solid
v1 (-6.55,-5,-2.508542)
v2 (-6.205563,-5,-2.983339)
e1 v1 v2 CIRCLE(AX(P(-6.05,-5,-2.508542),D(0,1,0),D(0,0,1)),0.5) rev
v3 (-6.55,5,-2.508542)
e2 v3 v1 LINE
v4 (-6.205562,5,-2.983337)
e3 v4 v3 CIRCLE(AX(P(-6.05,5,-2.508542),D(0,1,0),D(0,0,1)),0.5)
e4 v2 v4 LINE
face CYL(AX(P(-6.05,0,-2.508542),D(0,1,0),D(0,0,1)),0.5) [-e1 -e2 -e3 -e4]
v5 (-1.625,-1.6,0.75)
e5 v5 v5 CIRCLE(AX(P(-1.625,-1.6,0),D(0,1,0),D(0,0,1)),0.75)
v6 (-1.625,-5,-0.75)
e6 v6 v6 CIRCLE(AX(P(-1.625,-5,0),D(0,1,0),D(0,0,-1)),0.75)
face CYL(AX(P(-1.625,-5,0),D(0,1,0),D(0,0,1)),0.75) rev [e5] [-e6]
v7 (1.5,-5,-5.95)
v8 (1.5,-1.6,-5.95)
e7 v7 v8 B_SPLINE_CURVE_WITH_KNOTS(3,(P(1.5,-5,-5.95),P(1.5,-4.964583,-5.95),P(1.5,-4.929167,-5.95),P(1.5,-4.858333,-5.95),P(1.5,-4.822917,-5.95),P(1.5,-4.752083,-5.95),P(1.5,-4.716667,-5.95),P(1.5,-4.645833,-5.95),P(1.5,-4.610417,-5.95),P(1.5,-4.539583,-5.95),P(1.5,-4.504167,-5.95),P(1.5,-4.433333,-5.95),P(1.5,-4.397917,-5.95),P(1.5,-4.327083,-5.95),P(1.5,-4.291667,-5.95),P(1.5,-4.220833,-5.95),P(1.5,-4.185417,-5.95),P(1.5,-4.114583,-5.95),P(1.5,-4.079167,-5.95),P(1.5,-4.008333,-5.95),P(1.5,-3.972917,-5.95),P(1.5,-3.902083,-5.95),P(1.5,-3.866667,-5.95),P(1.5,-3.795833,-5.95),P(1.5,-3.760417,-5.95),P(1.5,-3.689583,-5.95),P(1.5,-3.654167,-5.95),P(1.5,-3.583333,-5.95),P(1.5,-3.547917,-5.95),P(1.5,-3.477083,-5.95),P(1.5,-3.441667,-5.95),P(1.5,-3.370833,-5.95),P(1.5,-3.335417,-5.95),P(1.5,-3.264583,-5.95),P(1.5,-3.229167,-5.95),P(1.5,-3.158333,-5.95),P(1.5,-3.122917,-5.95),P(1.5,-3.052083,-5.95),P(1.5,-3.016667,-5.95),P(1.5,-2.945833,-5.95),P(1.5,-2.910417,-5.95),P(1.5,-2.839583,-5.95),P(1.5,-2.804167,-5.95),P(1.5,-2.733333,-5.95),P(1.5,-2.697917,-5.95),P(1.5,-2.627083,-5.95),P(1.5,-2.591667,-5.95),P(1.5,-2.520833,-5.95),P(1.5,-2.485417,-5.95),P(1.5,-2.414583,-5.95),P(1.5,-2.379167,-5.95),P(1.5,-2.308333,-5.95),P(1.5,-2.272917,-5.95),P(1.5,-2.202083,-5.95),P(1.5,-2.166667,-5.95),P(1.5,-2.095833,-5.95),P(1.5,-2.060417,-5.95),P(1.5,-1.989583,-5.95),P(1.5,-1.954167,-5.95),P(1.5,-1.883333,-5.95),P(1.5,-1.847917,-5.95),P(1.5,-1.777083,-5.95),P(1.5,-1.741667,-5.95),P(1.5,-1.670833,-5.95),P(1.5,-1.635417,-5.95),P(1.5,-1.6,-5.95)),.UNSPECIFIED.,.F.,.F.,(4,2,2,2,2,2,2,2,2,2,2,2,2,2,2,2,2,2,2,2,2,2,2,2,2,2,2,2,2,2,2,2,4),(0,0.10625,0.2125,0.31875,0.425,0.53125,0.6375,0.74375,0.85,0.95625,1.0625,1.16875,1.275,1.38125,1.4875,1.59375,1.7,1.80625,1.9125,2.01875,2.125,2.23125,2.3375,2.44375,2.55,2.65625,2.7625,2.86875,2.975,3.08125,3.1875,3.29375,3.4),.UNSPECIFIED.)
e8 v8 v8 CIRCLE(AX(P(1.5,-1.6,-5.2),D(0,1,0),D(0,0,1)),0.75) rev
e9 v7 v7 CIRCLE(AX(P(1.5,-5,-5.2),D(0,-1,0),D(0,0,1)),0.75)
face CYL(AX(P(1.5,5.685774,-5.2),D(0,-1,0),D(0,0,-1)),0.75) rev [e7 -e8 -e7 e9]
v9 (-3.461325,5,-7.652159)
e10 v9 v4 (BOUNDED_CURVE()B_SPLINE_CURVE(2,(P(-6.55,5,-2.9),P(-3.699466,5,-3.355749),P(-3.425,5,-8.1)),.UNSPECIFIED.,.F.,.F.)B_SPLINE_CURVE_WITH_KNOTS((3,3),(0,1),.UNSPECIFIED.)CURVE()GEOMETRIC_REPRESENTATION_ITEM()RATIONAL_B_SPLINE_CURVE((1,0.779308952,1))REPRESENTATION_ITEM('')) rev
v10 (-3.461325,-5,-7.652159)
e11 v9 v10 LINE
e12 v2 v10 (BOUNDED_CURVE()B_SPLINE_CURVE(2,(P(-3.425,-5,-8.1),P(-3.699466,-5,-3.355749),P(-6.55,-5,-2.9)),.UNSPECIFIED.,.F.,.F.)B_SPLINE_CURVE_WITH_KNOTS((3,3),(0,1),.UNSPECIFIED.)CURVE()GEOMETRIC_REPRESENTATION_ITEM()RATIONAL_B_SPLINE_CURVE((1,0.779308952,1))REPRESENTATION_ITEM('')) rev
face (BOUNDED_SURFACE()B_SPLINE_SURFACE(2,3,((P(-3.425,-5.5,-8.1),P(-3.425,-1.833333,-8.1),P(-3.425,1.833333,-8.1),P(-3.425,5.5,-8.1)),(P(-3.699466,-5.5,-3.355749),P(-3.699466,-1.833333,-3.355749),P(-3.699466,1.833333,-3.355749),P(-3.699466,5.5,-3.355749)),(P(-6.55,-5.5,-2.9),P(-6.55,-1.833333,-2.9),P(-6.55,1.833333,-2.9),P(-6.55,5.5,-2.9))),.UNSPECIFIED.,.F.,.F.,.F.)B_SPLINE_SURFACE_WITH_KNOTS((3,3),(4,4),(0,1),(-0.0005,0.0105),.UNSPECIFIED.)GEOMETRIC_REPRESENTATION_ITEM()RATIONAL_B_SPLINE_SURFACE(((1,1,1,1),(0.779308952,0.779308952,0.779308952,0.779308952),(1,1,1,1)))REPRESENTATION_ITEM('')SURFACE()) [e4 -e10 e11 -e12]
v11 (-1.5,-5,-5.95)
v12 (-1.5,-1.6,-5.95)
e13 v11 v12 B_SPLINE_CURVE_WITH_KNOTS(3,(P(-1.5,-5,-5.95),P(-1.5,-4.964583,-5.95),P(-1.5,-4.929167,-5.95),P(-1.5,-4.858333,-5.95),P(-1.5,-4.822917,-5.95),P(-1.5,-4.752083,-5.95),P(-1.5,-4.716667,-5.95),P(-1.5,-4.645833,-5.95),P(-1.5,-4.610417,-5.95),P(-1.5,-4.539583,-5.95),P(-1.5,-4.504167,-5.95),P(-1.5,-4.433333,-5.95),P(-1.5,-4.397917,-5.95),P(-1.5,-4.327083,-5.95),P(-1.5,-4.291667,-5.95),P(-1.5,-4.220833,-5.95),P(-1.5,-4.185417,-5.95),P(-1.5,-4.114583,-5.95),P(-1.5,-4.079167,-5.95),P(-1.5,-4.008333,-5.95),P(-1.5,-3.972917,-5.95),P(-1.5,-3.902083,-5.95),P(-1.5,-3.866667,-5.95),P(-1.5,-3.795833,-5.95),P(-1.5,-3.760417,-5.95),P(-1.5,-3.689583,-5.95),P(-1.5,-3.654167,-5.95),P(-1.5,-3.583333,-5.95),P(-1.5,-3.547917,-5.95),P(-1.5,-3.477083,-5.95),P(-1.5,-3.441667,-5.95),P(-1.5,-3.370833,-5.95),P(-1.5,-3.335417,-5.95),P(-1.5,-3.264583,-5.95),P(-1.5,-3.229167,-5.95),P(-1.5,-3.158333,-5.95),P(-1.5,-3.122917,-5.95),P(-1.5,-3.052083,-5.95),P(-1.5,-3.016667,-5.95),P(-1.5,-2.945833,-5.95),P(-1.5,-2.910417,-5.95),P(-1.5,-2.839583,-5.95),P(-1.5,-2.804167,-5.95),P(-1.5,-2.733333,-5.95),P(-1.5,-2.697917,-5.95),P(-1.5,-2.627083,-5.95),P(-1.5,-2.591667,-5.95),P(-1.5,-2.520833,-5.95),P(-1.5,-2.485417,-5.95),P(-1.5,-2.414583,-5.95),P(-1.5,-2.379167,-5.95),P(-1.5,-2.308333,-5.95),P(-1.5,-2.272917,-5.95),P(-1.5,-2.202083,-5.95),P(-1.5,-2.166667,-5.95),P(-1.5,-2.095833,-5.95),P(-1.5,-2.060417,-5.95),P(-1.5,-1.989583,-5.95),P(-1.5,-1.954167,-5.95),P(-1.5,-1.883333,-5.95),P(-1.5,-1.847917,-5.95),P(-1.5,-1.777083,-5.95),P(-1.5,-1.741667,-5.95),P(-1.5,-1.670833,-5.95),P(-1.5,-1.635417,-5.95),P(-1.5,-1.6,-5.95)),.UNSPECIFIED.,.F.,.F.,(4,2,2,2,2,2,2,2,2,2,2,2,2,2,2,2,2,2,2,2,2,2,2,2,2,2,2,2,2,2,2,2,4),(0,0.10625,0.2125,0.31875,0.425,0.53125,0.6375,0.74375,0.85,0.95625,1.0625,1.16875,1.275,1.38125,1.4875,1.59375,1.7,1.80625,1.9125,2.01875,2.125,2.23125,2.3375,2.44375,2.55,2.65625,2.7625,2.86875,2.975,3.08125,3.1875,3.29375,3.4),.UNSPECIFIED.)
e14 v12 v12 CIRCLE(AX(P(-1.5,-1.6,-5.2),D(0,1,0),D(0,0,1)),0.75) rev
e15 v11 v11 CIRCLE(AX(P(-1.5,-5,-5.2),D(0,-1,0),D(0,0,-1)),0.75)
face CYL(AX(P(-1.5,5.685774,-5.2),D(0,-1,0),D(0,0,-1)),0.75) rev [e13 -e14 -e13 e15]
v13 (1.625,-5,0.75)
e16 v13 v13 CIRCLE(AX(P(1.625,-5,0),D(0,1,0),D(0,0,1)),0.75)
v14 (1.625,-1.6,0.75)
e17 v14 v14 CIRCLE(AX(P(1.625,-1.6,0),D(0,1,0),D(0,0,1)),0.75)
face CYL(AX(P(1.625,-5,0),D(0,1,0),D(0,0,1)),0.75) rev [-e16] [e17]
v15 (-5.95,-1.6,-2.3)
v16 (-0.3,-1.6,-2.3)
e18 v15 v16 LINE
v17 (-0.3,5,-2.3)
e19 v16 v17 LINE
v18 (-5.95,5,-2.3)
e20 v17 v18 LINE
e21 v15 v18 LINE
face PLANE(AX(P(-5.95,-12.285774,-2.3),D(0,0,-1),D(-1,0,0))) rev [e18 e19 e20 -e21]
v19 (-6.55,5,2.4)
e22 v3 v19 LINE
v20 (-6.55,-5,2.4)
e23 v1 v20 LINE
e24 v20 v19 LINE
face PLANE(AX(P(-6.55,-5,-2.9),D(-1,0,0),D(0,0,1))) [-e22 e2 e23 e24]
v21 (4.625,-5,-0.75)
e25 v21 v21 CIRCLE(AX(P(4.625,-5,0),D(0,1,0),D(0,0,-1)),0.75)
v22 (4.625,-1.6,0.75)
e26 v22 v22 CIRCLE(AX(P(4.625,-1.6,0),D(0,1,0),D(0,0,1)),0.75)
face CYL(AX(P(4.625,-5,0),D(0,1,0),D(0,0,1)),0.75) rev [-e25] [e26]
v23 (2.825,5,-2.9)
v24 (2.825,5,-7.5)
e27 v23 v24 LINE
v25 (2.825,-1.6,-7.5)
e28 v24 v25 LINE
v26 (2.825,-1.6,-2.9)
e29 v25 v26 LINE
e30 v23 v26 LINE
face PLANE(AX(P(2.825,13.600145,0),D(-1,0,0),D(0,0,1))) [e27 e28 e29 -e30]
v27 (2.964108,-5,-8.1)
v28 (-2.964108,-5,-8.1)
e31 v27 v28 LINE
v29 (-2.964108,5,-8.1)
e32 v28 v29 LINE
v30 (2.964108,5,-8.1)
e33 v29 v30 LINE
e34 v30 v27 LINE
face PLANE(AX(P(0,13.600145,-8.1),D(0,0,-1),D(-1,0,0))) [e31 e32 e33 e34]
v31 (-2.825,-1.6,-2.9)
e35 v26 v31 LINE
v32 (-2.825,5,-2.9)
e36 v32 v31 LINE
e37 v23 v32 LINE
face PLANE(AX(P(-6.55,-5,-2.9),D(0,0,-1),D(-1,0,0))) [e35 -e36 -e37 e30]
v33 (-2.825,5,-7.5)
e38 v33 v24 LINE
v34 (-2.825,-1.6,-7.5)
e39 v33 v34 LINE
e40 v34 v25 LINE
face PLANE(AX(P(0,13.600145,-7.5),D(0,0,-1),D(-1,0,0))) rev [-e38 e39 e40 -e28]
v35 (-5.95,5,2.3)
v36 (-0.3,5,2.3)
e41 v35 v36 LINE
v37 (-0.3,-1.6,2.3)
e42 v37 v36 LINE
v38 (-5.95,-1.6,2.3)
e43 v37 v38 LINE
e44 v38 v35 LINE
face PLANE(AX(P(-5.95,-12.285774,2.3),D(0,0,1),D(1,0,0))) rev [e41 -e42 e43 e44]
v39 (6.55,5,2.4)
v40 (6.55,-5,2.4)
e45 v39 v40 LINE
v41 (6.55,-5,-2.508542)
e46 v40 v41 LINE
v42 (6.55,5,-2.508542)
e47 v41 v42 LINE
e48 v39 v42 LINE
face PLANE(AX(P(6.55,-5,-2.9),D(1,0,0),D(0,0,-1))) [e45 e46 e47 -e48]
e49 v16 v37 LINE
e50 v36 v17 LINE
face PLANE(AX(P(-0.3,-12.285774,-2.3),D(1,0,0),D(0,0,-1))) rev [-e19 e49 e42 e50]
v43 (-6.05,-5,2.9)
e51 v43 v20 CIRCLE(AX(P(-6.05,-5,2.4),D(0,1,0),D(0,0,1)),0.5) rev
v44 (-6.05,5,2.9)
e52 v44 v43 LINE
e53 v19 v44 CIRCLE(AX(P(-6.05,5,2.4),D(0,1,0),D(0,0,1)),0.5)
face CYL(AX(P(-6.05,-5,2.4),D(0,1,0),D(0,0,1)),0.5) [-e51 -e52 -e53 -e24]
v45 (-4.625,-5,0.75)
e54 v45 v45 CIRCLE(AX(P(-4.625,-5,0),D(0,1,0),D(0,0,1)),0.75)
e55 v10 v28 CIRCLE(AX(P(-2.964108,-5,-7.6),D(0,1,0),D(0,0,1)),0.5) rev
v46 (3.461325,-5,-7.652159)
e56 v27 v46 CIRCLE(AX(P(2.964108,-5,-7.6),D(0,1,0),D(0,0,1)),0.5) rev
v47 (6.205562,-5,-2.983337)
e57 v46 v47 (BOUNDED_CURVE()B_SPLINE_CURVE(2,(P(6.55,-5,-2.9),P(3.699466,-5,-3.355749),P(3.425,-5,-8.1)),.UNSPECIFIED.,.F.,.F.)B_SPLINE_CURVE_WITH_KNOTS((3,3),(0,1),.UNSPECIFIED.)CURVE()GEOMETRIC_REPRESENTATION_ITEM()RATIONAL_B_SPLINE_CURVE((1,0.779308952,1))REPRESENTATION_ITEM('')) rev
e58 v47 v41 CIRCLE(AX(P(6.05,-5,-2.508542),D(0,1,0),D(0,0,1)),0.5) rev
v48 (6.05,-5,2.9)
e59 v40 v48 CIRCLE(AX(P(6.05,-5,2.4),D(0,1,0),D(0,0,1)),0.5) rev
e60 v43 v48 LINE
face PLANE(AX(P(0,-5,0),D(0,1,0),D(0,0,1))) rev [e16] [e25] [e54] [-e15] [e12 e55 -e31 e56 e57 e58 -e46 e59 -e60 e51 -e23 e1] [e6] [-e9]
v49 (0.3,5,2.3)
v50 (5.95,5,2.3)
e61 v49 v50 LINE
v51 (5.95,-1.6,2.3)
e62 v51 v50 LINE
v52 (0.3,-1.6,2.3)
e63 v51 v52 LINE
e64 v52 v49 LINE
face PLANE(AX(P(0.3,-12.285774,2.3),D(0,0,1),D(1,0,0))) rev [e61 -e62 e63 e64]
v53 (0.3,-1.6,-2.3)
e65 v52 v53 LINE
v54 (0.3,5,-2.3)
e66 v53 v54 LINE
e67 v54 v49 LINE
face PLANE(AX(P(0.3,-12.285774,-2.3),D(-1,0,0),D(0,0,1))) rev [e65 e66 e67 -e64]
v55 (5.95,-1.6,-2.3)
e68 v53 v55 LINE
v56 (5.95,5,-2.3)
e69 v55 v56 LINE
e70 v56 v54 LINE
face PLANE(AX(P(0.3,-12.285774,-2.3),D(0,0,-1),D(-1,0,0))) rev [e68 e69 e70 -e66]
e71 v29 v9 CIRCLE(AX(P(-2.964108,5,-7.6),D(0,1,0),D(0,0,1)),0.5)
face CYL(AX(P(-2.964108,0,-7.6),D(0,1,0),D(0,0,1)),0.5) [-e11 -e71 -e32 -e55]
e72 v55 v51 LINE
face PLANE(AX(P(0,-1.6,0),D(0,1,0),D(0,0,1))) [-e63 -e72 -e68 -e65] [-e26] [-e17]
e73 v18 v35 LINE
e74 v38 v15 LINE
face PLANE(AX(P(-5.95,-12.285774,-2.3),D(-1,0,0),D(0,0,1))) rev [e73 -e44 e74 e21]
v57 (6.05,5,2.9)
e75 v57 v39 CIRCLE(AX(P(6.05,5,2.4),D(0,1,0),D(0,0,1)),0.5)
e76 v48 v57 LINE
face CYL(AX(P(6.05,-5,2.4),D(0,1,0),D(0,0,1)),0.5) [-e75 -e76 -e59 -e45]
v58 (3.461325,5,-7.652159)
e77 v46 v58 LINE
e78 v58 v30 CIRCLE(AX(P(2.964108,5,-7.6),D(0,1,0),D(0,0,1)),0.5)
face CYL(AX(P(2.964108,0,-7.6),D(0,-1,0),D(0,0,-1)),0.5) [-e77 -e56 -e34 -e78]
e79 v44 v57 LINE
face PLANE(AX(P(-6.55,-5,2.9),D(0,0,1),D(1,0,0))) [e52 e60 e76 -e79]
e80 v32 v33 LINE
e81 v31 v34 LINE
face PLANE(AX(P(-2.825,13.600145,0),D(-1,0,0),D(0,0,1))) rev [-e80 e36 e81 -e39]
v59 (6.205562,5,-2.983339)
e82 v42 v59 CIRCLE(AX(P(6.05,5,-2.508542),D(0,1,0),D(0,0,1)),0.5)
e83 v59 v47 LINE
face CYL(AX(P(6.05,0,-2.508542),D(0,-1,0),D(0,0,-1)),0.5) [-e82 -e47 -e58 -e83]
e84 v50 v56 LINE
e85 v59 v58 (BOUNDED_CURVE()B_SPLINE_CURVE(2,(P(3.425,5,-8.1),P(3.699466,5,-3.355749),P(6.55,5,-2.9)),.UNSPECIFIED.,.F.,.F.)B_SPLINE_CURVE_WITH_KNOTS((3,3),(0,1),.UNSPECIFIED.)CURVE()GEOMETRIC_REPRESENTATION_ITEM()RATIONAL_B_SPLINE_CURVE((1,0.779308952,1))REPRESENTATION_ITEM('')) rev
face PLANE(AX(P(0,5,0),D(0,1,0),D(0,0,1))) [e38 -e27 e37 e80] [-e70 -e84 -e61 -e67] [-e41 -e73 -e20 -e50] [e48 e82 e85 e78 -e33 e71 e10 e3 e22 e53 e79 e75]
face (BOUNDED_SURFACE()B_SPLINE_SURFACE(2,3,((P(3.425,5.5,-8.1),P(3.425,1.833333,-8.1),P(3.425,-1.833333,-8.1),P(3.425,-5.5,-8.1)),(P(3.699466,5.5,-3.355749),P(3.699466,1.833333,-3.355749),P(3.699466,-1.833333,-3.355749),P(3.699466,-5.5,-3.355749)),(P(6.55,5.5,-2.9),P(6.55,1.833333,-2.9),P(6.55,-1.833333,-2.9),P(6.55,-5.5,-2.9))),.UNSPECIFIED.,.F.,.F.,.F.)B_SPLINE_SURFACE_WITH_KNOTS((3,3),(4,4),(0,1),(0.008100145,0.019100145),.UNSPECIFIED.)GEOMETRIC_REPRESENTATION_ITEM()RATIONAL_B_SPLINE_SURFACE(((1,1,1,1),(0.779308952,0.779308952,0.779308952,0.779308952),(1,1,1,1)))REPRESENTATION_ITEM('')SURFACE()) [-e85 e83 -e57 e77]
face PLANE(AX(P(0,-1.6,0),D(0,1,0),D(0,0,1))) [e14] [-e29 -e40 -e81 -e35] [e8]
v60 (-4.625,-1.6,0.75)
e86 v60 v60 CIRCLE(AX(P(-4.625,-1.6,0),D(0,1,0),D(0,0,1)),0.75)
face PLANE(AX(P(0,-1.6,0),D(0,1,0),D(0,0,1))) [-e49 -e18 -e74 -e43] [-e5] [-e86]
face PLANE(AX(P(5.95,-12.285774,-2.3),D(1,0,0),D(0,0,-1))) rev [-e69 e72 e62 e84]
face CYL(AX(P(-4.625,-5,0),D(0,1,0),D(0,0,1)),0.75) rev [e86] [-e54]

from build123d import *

# Parameters (mm, degrees)
SKETCH1_W               = 13.1
SKETCH1_H               = 5.8
BOSS_EXTRUDE1_DEPTH     = 5
SKETCH10_W              = 5.65
SKETCH10_H              = 4.6
CUT_EXTRUDE7_DEPTH      = 6.6
CUT_EXTRUDE6_DEPTH      = 9.735702605
CUT_EXTRUDE6_DEPTH_BACK = 9.735702605
SKETCH9_R               = 0.75
BOSS_EXTRUDE2_START     = -5
BOSS_EXTRUDE2_DEPTH     = 10
SKETCH12_W              = 5.65
SKETCH12_H              = 4.6
SKETCH12_R              = 0.75
BOSS_EXTRUDE3_DEPTH     = 3.4
FILLET1_START           = -5
FILLET1_DEPTH           = 10
FILLET2_R               = 0.5


with BuildPart() as part:
    # Sketch1 → Boss-Extrude1 (new, symmetric)
    with BuildSketch(Plane(origin=(0, 0, 0), x_dir=(1, 0, 0), z_dir=(0, 1, 0))):
        Rectangle(SKETCH1_W, SKETCH1_H)
    extrude(amount=BOSS_EXTRUDE1_DEPTH, both=True)

    # Sketch10 → Cut-Extrude7 (cut)
    with BuildSketch(Plane(origin=(0, 5, 0), x_dir=(1, 0, 0), z_dir=(0, 1, 0))):
        with Locations((-3.125, 0)):
            Rectangle(SKETCH10_W, SKETCH10_H)
        with Locations((3.125, 0)):
            Rectangle(SKETCH10_W, SKETCH10_H)
    extrude(amount=-CUT_EXTRUDE7_DEPTH, mode=Mode.SUBTRACT)

    # Sketch9 → Cut-Extrude6 (cut, two sides: drawn at the far end of the back side and taken through both)
    with BuildSketch(Plane(origin=(0, 0, 0), x_dir=(1, 0, 0), z_dir=(0, 1, 0)).offset(-CUT_EXTRUDE6_DEPTH_BACK)):
        with Locations(Location((-4.625, 0, 0), (0, 0, 270))):
            Circle(SKETCH9_R)
        with Locations(Location((-1.625, 0, 0), (0, 0, 270))):
            Circle(SKETCH9_R)
        with Locations(Location((1.625, 0, 0), (0, 0, 270))):
            Circle(SKETCH9_R)
        with Locations(Location((4.625, 0, 0), (0, 0, 270))):
            Circle(SKETCH9_R)
    extrude(amount=CUT_EXTRUDE6_DEPTH + CUT_EXTRUDE6_DEPTH_BACK, mode=Mode.SUBTRACT)

    # Sketch11 → Boss-Extrude2 (add)
    with BuildSketch(Plane(origin=(0, 0, 0), x_dir=(1, 0, 0), z_dir=(0, 1, 0)).offset(BOSS_EXTRUDE2_START)):
        Polygon((-3.425, 8.1), (-3.425, 2.9), (-2.825, 2.9), (-2.825, 7.5), (2.825, 7.5), (2.825, 2.9), (3.425, 2.9), (3.425, 8.1), align=None)
    extrude(amount=BOSS_EXTRUDE2_DEPTH)

    # Sketch12 → Boss-Extrude3 (add)
    with BuildSketch(Plane.XZ.offset(5)):
        with Locations((0, -5.2)):
            Rectangle(SKETCH12_W, SKETCH12_H)
        with Locations(Location((-1.5, -5.2, 0), (0, 0, 270))):
            Circle(SKETCH12_R, mode=Mode.SUBTRACT)
        with Locations(Location((1.5, -5.2, 0), (0, 0, 270))):
            Circle(SKETCH12_R, mode=Mode.SUBTRACT)
    extrude(amount=-BOSS_EXTRUDE3_DEPTH)

    # Fillet1: read off the stored shape, not the designer's step
    # Fillet1 outline → Fillet1 (add)
    with BuildSketch(Plane(origin=(0, 0, 0), x_dir=(1, 0, 0), z_dir=(0, 1, 0)).offset(FILLET1_START)):
        with BuildLine():
            add(Edge.make_bspline(
                [(3.425, 8.1), (3.699466412, 3.355749046), (6.55, 2.9)],
                knots=[0, 0, 0, 1, 1, 1], degree=2, weights=[1, 0.779308952, 1]))
            Line((3.425, 8.1), (3.425, 2.9))
            Line((3.425, 2.9), (6.55, 2.9))
        make_face()
        with BuildLine():
            Line((-3.425, 2.9), (-3.425, 8.1))
            add(Edge.make_bspline(
                [(-3.425, 8.1), (-3.699466412, 3.355749046), (-6.55, 2.9)],
                knots=[0, 0, 0, 1, 1, 1], degree=2, weights=[1, 0.779308952, 1]))
            Line((-6.55, 2.9), (-3.425, 2.9))
        make_face()
    extrude(amount=FILLET1_DEPTH)

    # Fillet2
    fillet2_edges = [part.edges().sort_by_distance(p)[0] for p in [
        (-6.55, 0, -2.9),
        (-3.425, 0, -8.1),
        (3.425, 0, -8.1),
        (6.55, 0, -2.9),
        (6.55, 0, 2.9),
        (-6.55, 0, 2.9),
    ]]
    fillet(fillet2_edges, radius=FILLET2_R)


solid = part.part
